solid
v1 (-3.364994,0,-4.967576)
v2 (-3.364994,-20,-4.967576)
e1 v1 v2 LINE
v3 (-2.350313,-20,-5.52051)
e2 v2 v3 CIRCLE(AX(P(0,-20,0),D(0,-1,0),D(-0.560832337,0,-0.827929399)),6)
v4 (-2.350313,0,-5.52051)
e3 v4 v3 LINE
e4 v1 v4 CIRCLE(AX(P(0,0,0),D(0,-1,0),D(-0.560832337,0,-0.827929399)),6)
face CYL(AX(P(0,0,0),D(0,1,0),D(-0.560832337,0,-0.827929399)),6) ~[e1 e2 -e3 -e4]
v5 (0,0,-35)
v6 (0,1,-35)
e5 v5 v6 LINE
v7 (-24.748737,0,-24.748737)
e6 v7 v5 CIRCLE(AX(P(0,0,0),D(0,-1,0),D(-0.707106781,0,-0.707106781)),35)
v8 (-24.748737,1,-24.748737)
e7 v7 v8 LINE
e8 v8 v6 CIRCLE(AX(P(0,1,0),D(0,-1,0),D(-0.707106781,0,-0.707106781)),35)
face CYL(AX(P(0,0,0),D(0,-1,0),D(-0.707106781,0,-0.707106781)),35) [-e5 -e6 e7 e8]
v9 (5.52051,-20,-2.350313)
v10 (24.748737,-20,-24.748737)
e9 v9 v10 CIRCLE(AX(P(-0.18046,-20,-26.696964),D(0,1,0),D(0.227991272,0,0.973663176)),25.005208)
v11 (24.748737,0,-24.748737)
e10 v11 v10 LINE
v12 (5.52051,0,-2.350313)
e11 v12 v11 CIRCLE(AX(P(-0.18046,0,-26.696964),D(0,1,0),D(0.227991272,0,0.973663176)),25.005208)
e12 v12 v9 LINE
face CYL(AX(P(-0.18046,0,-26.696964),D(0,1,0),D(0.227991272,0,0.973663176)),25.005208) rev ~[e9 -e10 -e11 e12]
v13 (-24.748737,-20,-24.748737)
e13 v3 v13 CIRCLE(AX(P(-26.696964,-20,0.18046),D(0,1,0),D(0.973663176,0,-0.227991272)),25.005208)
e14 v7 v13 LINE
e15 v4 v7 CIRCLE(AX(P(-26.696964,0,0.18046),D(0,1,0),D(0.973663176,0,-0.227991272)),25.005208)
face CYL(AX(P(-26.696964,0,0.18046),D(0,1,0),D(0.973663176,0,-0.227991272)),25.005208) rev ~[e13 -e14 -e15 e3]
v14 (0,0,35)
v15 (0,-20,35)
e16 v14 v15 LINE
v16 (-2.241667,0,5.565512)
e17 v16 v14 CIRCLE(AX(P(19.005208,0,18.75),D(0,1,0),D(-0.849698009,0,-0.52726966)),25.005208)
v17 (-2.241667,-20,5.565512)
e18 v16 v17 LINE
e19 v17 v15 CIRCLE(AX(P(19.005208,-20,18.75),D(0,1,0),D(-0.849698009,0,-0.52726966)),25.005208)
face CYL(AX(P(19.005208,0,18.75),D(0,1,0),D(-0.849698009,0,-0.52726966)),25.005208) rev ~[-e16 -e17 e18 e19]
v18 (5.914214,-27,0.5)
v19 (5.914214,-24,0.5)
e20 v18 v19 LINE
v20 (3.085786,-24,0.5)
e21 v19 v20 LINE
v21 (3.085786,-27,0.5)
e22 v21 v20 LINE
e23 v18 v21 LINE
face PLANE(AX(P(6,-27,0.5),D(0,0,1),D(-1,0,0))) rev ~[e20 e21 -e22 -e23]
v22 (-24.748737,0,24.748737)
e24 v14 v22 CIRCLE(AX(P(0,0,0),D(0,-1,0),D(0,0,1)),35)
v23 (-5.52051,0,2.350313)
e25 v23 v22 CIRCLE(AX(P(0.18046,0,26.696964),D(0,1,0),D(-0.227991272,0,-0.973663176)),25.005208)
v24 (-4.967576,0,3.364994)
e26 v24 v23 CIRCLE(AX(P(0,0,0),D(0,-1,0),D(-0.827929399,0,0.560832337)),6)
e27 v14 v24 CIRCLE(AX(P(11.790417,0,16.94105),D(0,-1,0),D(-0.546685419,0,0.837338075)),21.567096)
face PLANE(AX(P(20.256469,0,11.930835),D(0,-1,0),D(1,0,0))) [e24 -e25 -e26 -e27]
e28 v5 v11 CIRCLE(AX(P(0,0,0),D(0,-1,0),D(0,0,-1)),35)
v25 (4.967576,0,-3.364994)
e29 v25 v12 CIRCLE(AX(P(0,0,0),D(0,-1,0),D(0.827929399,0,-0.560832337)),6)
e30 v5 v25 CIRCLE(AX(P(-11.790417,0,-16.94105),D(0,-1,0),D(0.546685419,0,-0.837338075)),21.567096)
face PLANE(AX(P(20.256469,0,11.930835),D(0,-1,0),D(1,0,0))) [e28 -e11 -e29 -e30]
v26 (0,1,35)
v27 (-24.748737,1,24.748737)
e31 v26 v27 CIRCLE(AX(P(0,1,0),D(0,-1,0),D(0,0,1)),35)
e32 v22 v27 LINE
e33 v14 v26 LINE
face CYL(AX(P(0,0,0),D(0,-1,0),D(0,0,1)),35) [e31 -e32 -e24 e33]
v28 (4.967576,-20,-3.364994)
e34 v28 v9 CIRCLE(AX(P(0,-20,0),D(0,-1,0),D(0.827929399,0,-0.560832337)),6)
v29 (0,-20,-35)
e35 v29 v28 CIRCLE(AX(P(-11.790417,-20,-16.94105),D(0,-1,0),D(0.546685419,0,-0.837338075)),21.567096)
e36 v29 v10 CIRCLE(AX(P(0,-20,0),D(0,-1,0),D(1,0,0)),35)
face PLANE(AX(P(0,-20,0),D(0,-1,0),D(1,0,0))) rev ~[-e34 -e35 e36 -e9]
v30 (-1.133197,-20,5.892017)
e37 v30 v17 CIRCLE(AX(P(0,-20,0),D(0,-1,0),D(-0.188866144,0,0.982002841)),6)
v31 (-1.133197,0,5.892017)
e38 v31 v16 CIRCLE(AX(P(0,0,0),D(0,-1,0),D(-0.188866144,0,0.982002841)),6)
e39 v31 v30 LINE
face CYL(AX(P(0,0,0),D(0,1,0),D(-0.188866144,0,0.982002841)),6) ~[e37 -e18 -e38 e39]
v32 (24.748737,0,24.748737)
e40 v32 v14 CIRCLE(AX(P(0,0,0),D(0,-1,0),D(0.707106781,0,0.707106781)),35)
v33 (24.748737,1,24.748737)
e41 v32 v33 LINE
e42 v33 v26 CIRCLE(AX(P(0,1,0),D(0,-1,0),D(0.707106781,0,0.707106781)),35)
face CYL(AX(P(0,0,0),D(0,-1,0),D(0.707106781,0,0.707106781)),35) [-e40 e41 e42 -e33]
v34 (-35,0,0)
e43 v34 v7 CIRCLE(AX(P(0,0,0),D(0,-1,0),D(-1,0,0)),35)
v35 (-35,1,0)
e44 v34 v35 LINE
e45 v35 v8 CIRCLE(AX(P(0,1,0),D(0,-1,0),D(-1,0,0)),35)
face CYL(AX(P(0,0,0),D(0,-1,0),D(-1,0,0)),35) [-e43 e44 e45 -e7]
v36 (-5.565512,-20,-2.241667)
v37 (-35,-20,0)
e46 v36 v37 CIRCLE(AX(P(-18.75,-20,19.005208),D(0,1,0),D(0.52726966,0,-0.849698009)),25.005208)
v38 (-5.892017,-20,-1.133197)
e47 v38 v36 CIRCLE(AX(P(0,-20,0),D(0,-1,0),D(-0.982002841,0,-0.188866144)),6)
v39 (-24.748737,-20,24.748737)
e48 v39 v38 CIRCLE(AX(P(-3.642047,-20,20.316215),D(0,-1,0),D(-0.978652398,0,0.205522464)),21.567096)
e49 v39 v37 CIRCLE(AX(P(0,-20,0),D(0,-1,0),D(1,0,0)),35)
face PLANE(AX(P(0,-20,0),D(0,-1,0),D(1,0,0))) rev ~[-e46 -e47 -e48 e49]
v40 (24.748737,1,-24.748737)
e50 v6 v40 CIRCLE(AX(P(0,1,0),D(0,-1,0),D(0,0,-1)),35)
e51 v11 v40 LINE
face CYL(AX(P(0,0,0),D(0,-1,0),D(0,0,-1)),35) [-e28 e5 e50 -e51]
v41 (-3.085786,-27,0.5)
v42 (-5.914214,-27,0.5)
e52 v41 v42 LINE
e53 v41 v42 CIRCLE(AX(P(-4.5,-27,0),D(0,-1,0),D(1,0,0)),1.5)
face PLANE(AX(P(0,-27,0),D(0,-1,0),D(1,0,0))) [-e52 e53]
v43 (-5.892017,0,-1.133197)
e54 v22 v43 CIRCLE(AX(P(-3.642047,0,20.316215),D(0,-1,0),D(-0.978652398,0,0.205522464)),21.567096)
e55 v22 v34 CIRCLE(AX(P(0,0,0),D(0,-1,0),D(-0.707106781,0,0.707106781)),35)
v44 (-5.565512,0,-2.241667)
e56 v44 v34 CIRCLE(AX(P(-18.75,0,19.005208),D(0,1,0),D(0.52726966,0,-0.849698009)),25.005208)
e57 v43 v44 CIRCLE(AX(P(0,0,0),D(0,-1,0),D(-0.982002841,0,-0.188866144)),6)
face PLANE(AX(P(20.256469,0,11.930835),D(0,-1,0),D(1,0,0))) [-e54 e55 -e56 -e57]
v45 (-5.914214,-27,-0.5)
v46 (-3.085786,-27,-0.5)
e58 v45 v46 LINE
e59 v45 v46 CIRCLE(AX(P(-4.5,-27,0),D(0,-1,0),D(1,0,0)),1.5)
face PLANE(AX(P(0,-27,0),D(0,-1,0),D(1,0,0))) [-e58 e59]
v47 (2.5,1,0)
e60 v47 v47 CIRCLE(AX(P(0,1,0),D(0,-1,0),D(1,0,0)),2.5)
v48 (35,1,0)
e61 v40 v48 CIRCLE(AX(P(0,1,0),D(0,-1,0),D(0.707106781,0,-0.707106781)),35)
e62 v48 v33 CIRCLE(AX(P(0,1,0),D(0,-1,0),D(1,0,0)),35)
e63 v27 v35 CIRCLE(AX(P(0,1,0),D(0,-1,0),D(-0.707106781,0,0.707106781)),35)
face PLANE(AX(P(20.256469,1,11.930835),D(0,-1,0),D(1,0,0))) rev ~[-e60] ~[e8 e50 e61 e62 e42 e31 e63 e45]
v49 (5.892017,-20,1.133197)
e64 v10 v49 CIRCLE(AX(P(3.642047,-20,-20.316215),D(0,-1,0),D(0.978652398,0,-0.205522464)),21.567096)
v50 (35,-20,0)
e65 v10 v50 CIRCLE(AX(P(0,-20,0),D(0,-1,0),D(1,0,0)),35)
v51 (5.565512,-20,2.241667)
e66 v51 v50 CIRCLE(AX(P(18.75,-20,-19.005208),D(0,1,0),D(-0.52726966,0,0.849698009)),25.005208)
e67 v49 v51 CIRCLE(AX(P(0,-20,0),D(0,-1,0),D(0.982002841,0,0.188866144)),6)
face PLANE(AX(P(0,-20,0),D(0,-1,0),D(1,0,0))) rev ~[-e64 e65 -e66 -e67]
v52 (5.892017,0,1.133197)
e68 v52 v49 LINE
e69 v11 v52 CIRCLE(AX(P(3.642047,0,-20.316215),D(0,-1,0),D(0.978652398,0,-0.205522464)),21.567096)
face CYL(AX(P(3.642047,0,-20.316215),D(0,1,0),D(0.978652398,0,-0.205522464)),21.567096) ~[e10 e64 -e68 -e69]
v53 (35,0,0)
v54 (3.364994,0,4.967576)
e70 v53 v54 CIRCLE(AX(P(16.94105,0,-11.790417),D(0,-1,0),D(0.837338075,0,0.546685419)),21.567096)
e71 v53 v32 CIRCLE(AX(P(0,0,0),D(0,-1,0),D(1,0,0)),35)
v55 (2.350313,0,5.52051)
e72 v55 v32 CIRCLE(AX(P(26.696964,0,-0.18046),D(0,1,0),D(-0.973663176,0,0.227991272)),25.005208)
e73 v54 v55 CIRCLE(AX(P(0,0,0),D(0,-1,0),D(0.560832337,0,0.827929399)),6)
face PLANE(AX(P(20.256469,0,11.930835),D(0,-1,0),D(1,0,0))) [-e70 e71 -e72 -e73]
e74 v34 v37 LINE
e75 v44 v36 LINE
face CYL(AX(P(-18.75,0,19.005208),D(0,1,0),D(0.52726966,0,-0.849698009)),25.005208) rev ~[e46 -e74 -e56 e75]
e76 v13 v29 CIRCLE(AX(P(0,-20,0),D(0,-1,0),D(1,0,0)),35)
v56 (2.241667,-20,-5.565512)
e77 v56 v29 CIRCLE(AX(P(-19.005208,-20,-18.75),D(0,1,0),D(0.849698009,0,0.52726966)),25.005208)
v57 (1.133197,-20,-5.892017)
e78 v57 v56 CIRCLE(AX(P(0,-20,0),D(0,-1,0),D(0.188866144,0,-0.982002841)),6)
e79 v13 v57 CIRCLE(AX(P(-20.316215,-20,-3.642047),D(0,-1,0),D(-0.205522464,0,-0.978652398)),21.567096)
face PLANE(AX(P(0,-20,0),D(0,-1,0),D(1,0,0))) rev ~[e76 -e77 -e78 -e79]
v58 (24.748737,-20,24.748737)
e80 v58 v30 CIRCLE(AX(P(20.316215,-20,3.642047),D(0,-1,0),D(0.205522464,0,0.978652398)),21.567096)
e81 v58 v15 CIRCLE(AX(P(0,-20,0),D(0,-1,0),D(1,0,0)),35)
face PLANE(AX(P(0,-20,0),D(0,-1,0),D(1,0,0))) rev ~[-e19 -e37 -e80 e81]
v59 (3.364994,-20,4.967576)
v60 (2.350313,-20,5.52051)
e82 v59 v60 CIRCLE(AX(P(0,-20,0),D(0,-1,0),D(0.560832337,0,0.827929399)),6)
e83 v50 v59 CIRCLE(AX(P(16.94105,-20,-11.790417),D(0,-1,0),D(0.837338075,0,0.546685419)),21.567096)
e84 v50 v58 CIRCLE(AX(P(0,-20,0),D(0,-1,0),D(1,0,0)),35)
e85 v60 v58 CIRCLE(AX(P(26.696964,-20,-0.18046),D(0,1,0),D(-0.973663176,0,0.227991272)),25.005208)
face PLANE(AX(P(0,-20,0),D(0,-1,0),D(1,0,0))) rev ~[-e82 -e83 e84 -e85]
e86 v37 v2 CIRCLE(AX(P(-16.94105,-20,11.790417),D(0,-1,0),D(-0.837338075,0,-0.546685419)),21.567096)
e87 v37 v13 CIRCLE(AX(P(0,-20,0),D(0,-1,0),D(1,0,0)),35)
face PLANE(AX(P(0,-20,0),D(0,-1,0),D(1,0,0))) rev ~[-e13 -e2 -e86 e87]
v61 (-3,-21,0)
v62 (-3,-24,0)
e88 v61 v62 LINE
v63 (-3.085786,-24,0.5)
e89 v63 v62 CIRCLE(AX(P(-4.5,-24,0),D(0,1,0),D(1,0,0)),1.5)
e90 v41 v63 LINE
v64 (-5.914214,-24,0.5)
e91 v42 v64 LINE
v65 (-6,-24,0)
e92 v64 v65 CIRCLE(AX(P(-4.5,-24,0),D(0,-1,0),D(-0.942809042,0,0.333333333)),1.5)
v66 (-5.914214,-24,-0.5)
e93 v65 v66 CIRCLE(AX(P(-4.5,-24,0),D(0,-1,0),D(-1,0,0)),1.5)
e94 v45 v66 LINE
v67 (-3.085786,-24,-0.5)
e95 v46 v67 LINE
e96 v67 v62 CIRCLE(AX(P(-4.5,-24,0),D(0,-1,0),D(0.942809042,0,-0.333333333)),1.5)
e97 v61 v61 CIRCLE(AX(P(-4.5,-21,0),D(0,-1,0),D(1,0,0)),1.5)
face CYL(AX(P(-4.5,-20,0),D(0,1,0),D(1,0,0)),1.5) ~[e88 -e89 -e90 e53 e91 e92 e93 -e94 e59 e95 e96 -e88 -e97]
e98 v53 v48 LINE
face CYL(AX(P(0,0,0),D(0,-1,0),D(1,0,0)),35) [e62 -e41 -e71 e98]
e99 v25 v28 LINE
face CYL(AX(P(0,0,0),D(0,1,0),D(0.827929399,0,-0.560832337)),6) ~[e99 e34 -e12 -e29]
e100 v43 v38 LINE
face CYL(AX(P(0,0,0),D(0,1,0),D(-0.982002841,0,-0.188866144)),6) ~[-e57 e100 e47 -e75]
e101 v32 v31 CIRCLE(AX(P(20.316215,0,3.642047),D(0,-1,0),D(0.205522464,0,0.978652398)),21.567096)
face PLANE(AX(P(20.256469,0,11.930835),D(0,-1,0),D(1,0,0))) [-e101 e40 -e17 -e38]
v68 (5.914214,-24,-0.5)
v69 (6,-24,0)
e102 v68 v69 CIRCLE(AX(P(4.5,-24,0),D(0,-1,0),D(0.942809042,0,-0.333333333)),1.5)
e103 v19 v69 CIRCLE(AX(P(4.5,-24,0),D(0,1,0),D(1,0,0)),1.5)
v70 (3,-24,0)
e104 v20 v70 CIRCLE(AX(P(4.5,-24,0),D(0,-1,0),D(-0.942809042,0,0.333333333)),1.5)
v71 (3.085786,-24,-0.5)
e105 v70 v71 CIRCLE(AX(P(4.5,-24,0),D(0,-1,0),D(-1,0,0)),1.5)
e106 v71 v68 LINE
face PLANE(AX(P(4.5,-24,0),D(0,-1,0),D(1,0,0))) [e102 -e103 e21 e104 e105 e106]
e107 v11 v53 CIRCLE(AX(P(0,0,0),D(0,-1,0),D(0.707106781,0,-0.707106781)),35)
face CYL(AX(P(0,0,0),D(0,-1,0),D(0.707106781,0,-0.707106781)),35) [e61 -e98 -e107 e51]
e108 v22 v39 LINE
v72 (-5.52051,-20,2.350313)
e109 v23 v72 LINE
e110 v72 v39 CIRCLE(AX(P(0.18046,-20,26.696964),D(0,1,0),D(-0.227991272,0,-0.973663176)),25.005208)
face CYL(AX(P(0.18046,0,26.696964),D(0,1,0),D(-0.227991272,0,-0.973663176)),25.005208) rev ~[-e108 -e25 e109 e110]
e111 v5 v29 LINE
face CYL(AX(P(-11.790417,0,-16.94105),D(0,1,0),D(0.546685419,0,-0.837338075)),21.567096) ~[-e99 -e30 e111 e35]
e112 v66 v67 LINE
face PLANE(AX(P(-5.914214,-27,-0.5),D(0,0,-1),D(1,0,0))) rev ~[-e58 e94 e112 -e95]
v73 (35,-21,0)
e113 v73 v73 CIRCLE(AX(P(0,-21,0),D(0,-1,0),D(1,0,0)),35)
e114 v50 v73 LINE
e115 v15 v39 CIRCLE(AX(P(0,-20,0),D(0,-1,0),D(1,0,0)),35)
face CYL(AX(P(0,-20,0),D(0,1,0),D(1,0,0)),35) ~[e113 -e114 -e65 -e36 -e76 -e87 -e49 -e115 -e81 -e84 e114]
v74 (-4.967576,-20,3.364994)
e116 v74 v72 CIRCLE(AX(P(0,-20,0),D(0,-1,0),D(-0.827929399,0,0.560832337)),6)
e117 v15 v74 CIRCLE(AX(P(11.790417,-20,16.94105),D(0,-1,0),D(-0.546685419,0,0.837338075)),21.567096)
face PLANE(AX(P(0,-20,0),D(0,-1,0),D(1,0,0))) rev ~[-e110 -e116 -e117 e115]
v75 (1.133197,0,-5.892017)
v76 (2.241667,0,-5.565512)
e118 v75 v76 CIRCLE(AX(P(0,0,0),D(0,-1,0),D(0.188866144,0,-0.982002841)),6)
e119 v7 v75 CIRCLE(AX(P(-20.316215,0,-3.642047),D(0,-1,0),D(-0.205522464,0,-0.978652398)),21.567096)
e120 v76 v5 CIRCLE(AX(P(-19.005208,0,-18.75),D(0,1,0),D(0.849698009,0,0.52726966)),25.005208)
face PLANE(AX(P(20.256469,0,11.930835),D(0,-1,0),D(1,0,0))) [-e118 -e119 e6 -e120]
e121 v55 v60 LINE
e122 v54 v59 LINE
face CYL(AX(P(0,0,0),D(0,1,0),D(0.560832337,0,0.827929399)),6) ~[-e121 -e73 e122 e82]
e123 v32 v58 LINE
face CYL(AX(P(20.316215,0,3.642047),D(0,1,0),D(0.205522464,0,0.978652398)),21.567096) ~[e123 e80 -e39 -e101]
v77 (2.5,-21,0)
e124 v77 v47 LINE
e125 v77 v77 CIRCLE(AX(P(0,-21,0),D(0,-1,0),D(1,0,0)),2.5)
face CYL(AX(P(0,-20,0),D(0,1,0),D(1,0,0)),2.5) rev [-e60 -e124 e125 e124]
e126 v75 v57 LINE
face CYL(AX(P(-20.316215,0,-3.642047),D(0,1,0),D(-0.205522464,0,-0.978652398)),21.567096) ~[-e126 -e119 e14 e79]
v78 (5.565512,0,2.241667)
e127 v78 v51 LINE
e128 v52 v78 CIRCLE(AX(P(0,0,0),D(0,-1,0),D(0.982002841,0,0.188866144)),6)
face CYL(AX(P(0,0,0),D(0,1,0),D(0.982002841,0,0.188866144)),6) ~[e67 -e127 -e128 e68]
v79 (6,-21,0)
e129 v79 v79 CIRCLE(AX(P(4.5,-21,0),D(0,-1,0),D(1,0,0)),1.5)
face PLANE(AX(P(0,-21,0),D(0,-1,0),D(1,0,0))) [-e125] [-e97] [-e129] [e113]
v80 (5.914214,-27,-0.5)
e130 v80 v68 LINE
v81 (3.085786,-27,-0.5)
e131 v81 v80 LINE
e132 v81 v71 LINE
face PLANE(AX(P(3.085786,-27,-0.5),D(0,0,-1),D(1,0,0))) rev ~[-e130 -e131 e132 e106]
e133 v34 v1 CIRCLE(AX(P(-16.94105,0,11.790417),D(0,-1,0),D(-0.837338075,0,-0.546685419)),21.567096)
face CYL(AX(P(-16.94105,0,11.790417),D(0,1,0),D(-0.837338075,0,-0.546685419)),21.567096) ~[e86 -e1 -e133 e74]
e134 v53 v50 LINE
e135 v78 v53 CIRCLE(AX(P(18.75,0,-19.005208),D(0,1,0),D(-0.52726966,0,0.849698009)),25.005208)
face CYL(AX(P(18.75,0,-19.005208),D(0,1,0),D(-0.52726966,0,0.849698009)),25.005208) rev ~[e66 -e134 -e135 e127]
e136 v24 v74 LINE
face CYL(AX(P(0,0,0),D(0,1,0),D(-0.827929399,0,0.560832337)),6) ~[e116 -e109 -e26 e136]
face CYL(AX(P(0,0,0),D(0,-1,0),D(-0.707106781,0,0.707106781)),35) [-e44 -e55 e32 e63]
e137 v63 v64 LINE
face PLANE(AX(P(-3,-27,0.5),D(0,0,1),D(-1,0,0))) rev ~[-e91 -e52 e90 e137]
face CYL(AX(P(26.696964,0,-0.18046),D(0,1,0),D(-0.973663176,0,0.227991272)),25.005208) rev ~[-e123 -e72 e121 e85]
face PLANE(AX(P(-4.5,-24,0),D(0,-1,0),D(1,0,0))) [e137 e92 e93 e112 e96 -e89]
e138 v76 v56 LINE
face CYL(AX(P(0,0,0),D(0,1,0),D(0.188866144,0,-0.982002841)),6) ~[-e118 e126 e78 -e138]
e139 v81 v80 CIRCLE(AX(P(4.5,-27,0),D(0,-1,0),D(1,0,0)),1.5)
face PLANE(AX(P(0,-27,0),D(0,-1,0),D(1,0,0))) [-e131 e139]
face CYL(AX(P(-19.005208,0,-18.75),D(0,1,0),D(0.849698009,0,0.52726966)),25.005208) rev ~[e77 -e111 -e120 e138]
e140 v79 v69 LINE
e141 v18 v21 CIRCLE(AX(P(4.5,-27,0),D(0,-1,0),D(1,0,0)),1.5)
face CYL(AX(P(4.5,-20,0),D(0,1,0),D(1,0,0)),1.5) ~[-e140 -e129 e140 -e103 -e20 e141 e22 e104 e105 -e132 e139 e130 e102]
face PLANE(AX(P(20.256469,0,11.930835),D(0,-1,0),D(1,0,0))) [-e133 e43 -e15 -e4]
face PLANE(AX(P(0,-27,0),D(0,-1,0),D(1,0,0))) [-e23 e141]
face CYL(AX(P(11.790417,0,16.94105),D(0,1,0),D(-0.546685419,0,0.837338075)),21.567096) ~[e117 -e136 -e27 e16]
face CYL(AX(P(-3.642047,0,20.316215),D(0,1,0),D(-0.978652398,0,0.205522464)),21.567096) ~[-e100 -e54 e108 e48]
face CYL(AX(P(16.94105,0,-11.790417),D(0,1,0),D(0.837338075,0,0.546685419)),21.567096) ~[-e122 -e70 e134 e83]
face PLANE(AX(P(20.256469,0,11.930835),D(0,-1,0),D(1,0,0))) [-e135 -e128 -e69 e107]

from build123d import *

# Parameters (mm, degrees)
F0_R     = 2.5
F1_DEPTH = 20
F2_DEPTH = 1
F3_R     = 35
F3_R_2   = 1.5
F3_R_3   = 2.5
F4_DEPTH = 1
F5_DEPTH = 7
F8_DEPTH = 3


with BuildPart() as f1:
    # F0 (on Front) → F1 (new body)
    with BuildSketch(Plane.XZ):
        with BuildLine():
            ThreePointArc((5.5655123118, 2.2416673945), (20.6488442828, 5.9277985889), (35, 0))
            ThreePointArc((35, 0), (20.2866870884, 9.5155994681), (3.3649940235, 4.9675763931))
            ThreePointArc((3.3649940235, 4.9675763931), (2.8709960308, 5.2685274784), (2.3503132806, 5.5205097122))
            ThreePointArc((2.3503132806, 5.5205097122), (10.4093512363, 18.7925243957), (24.7487373415, 24.7487373415))
            ThreePointArc((24.7487373415, 24.7487373415), (7.6163090971, 21.073398919), (-1.133196861, 5.8920170463))
            ThreePointArc((-1.133196861, 5.8920170463), (-1.6953107447, 5.755512269), (-2.2416673945, 5.5655123118))
            ThreePointArc((-2.2416673945, 5.5655123118), (-5.9277985889, 20.6488442828), (0, 35))
            ThreePointArc((0, 35), (-9.5155994681, 20.2866870884), (-4.9675763931, 3.3649940235))
            ThreePointArc((-4.9675763931, 3.3649940235), (-5.2685274784, 2.8709960308), (-5.5205097122, 2.3503132806))
            ThreePointArc((-5.5205097122, 2.3503132806), (-18.7925243957, 10.4093512363), (-24.7487373415, 24.7487373415))
            ThreePointArc((-24.7487373415, 24.7487373415), (-21.073398919, 7.6163090971), (-5.8920170463, -1.133196861))
            ThreePointArc((-5.8920170463, -1.133196861), (-5.755512269, -1.6953107447), (-5.5655123118, -2.2416673945))
            ThreePointArc((-5.5655123118, -2.2416673945), (-20.6488442828, -5.9277985889), (-35, 0))
            ThreePointArc((-35, 0), (-20.2866870884, -9.5155994681), (-3.3649940235, -4.9675763931))
            ThreePointArc((-3.3649940235, -4.9675763931), (-2.8709960308, -5.2685274784), (-2.3503132806, -5.5205097122))
            ThreePointArc((-2.3503132806, -5.5205097122), (-10.4093512363, -18.7925243957), (-24.7487373415, -24.7487373415))
            ThreePointArc((-24.7487373415, -24.7487373415), (-7.6163090971, -21.073398919), (1.133196861, -5.8920170463))
            ThreePointArc((1.133196861, -5.8920170463), (1.6953107447, -5.755512269), (2.2416673945, -5.5655123118))
            ThreePointArc((2.2416673945, -5.5655123118), (5.9277985889, -20.6488442828), (0, -35))
            ThreePointArc((0, -35), (9.5155994681, -20.2866870884), (4.9675763931, -3.3649940235))
            ThreePointArc((4.9675763931, -3.3649940235), (5.2685274784, -2.8709960308), (5.5205097122, -2.3503132806))
            ThreePointArc((5.5205097122, -2.3503132806), (18.7925243957, -10.4093512363), (24.7487373415, -24.7487373415))
            ThreePointArc((24.7487373415, -24.7487373415), (21.073398919, -7.6163090971), (5.8920170463, 1.133196861))
            ThreePointArc((5.8920170463, 1.133196861), (5.755512269, 1.6953107447), (5.5655123118, 2.2416673945))
        make_face()
        Circle(F0_R, mode=Mode.SUBTRACT)
    extrude(amount=F1_DEPTH)

    # F0 (on Front) → F2 (join)
    with BuildSketch(Plane.XZ):
        with BuildLine():
            ThreePointArc((3.3649940235, 4.9675763931), (20.2866870884, 9.5155994681), (35, 0))
            ThreePointArc((35, 0), (32.3357836379, 13.3939201328), (24.7487373415, 24.7487373415))
            ThreePointArc((24.7487373415, 24.7487373415), (10.4093512363, 18.7925243957), (2.3503132806, 5.5205097122))
            ThreePointArc((2.3503132806, 5.5205097122), (2.8709960308, 5.2685274784), (3.3649940235, 4.9675763931))
        make_face()
        with BuildLine():
            ThreePointArc((5.5655123118, 2.2416673945), (20.6488442828, 5.9277985889), (35, 0))
            ThreePointArc((35, 0), (20.2866870884, 9.5155994681), (3.3649940235, 4.9675763931))
            ThreePointArc((3.3649940235, 4.9675763931), (2.8709960308, 5.2685274784), (2.3503132806, 5.5205097122))
            ThreePointArc((2.3503132806, 5.5205097122), (10.4093512363, 18.7925243957), (24.7487373415, 24.7487373415))
            ThreePointArc((24.7487373415, 24.7487373415), (7.6163090971, 21.073398919), (-1.133196861, 5.8920170463))
            ThreePointArc((-1.133196861, 5.8920170463), (-1.6953107447, 5.755512269), (-2.2416673945, 5.5655123118))
            ThreePointArc((-2.2416673945, 5.5655123118), (-5.9277985889, 20.6488442828), (0, 35))
            ThreePointArc((0, 35), (-9.5155994681, 20.2866870884), (-4.9675763931, 3.3649940235))
            ThreePointArc((-4.9675763931, 3.3649940235), (-5.2685274784, 2.8709960308), (-5.5205097122, 2.3503132806))
            ThreePointArc((-5.5205097122, 2.3503132806), (-18.7925243957, 10.4093512363), (-24.7487373415, 24.7487373415))
            ThreePointArc((-24.7487373415, 24.7487373415), (-21.073398919, 7.6163090971), (-5.8920170463, -1.133196861))
            ThreePointArc((-5.8920170463, -1.133196861), (-5.755512269, -1.6953107447), (-5.5655123118, -2.2416673945))
            ThreePointArc((-5.5655123118, -2.2416673945), (-20.6488442828, -5.9277985889), (-35, 0))
            ThreePointArc((-35, 0), (-20.2866870884, -9.5155994681), (-3.3649940235, -4.9675763931))
            ThreePointArc((-3.3649940235, -4.9675763931), (-2.8709960308, -5.2685274784), (-2.3503132806, -5.5205097122))
            ThreePointArc((-2.3503132806, -5.5205097122), (-10.4093512363, -18.7925243957), (-24.7487373415, -24.7487373415))
            ThreePointArc((-24.7487373415, -24.7487373415), (-7.6163090971, -21.073398919), (1.133196861, -5.8920170463))
            ThreePointArc((1.133196861, -5.8920170463), (1.6953107447, -5.755512269), (2.2416673945, -5.5655123118))
            ThreePointArc((2.2416673945, -5.5655123118), (5.9277985889, -20.6488442828), (0, -35))
            ThreePointArc((0, -35), (9.5155994681, -20.2866870884), (4.9675763931, -3.3649940235))
            ThreePointArc((4.9675763931, -3.3649940235), (5.2685274784, -2.8709960308), (5.5205097122, -2.3503132806))
            ThreePointArc((5.5205097122, -2.3503132806), (18.7925243957, -10.4093512363), (24.7487373415, -24.7487373415))
            ThreePointArc((24.7487373415, -24.7487373415), (21.073398919, -7.6163090971), (5.8920170463, 1.133196861))
            ThreePointArc((5.8920170463, 1.133196861), (5.755512269, 1.6953107447), (5.5655123118, 2.2416673945))
        make_face()
        Circle(F0_R, mode=Mode.SUBTRACT)
        with BuildLine():
            ThreePointArc((24.7487373415, -24.7487373415), (32.3357836379, -13.3939201328), (35, 0))
            ThreePointArc((35, 0), (20.6488442828, 5.9277985889), (5.5655123118, 2.2416673945))
            ThreePointArc((5.5655123118, 2.2416673945), (5.755512269, 1.6953107447), (5.8920170463, 1.133196861))
            ThreePointArc((5.8920170463, 1.133196861), (21.073398919, -7.6163090971), (24.7487373415, -24.7487373415))
        make_face()
        with BuildLine():
            ThreePointArc((-1.133196861, 5.8920170463), (7.6163090971, 21.073398919), (24.7487373415, 24.7487373415))
            ThreePointArc((24.7487373415, 24.7487373415), (13.3939201328, 32.3357836379), (0, 35))
            ThreePointArc((0, 35), (-5.9277985889, 20.6488442828), (-2.2416673945, 5.5655123118))
            ThreePointArc((-2.2416673945, 5.5655123118), (-1.6953107447, 5.755512269), (-1.133196861, 5.8920170463))
        make_face()
        with BuildLine():
            ThreePointArc((0, -35), (13.3939201328, -32.3357836379), (24.7487373415, -24.7487373415))
            ThreePointArc((24.7487373415, -24.7487373415), (18.7925243957, -10.4093512363), (5.5205097122, -2.3503132806))
            ThreePointArc((5.5205097122, -2.3503132806), (5.2685274784, -2.8709960308), (4.9675763931, -3.3649940235))
            ThreePointArc((4.9675763931, -3.3649940235), (9.5155994681, -20.2866870884), (0, -35))
        make_face()
        with BuildLine():
            ThreePointArc((-4.9675763931, 3.3649940235), (-9.5155994681, 20.2866870884), (0, 35))
            ThreePointArc((0, 35), (-13.3939201328, 32.3357836379), (-24.7487373415, 24.7487373415))
            ThreePointArc((-24.7487373415, 24.7487373415), (-18.7925243957, 10.4093512363), (-5.5205097122, 2.3503132806))
            ThreePointArc((-5.5205097122, 2.3503132806), (-5.2685274784, 2.8709960308), (-4.9675763931, 3.3649940235))
        make_face()
        with BuildLine():
            ThreePointArc((-24.7487373415, -24.7487373415), (-13.3939201328, -32.3357836379), (0, -35))
            ThreePointArc((0, -35), (5.9277985889, -20.6488442828), (2.2416673945, -5.5655123118))
            ThreePointArc((2.2416673945, -5.5655123118), (1.6953107447, -5.755512269), (1.133196861, -5.8920170463))
            ThreePointArc((1.133196861, -5.8920170463), (-7.6163090971, -21.073398919), (-24.7487373415, -24.7487373415))
        make_face()
        with BuildLine():
            ThreePointArc((-5.8920170463, -1.133196861), (-21.073398919, 7.6163090971), (-24.7487373415, 24.7487373415))
            ThreePointArc((-24.7487373415, 24.7487373415), (-32.3357836379, 13.3939201328), (-35, 0))
            ThreePointArc((-35, 0), (-20.6488442828, -5.9277985889), (-5.5655123118, -2.2416673945))
            ThreePointArc((-5.5655123118, -2.2416673945), (-5.755512269, -1.6953107447), (-5.8920170463, -1.133196861))
        make_face()
        with BuildLine():
            ThreePointArc((-35, 0), (-32.3357836379, -13.3939201328), (-24.7487373415, -24.7487373415))
            ThreePointArc((-24.7487373415, -24.7487373415), (-10.4093512363, -18.7925243957), (-2.3503132806, -5.5205097122))
            ThreePointArc((-2.3503132806, -5.5205097122), (-2.8709960308, -5.2685274784), (-3.3649940235, -4.9675763931))
            ThreePointArc((-3.3649940235, -4.9675763931), (-20.2866870884, -9.5155994681), (-35, 0))
        make_face()
    extrude(amount=-F2_DEPTH)

    # F3 (on face) → F4 (join)
    with BuildSketch(Plane.XZ.offset(20)):
        Circle(F3_R)
        with Locations((-4.5, 0)):
            Circle(F3_R_2, mode=Mode.SUBTRACT)
        Circle(F3_R_3, mode=Mode.SUBTRACT)
        with Locations((4.5, 0)):
            Circle(F3_R_2, mode=Mode.SUBTRACT)
    extrude(amount=F4_DEPTH)

    # F5 (add): faces of the model
    f5_faces = [f1.faces().sort_by_distance(p)[0] for p in [
        (4.5, -20, 0),
        (-4.5, -20, 0),
    ]]
    extrude(f5_faces, amount=F5_DEPTH)

    # F6 (on face) + F7 (on face) → F8 (cut)
    with BuildSketch(Plane.XZ.offset(27)):
        with BuildLine():
            Line((-3.0857864376, 0.5), (-5.9142135624, 0.5))
            ThreePointArc((-5.9142135624, 0.5), (-5.9783978395, 0.2536529681), (-6, 0))
            ThreePointArc((-6, 0), (-5.9783978395, -0.2536529681), (-5.9142135624, -0.5))
            Line((-5.9142135624, -0.5), (-3.0857864376, -0.5))
            ThreePointArc((-3.0857864376, -0.5), (-3.0216021605, -0.2536529681), (-3, 0))
            ThreePointArc((-3, 0), (-3.0216021605, 0.2536529681), (-3.0857864376, 0.5))
        make_face()
        with BuildLine():
            Line((-3, 0.5), (-3.0857864376, 0.5))
            ThreePointArc((-3.0857864376, 0.5), (-3.0216021605, 0.2536529681), (-3, 0))
            Line((-3, 0), (-3, 0.5))
        make_face()
    with BuildSketch(Plane.XZ.offset(27)):
        with BuildLine():
            Line((5.9142135624, 0.5), (3.0857864376, 0.5))
            ThreePointArc((3.0857864376, 0.5), (3.0216021605, 0.2536529681), (3, 0))
            ThreePointArc((3, 0), (3.0216021605, -0.2536529681), (3.0857864376, -0.5))
            Line((3.0857864376, -0.5), (5.9142135624, -0.5))
            ThreePointArc((5.9142135624, -0.5), (5.9783978395, -0.2536529681), (6, 0))
            ThreePointArc((6, 0), (5.9783978395, 0.2536529681), (5.9142135624, 0.5))
        make_face()
        with BuildLine():
            Line((6, 0.5), (5.9142135624, 0.5))
            ThreePointArc((5.9142135624, 0.5), (5.9783978395, 0.2536529681), (6, 0))
            Line((6, 0), (6, 0.5))
        make_face()
    extrude(amount=-F8_DEPTH, mode=Mode.SUBTRACT)


solid = f1.part
